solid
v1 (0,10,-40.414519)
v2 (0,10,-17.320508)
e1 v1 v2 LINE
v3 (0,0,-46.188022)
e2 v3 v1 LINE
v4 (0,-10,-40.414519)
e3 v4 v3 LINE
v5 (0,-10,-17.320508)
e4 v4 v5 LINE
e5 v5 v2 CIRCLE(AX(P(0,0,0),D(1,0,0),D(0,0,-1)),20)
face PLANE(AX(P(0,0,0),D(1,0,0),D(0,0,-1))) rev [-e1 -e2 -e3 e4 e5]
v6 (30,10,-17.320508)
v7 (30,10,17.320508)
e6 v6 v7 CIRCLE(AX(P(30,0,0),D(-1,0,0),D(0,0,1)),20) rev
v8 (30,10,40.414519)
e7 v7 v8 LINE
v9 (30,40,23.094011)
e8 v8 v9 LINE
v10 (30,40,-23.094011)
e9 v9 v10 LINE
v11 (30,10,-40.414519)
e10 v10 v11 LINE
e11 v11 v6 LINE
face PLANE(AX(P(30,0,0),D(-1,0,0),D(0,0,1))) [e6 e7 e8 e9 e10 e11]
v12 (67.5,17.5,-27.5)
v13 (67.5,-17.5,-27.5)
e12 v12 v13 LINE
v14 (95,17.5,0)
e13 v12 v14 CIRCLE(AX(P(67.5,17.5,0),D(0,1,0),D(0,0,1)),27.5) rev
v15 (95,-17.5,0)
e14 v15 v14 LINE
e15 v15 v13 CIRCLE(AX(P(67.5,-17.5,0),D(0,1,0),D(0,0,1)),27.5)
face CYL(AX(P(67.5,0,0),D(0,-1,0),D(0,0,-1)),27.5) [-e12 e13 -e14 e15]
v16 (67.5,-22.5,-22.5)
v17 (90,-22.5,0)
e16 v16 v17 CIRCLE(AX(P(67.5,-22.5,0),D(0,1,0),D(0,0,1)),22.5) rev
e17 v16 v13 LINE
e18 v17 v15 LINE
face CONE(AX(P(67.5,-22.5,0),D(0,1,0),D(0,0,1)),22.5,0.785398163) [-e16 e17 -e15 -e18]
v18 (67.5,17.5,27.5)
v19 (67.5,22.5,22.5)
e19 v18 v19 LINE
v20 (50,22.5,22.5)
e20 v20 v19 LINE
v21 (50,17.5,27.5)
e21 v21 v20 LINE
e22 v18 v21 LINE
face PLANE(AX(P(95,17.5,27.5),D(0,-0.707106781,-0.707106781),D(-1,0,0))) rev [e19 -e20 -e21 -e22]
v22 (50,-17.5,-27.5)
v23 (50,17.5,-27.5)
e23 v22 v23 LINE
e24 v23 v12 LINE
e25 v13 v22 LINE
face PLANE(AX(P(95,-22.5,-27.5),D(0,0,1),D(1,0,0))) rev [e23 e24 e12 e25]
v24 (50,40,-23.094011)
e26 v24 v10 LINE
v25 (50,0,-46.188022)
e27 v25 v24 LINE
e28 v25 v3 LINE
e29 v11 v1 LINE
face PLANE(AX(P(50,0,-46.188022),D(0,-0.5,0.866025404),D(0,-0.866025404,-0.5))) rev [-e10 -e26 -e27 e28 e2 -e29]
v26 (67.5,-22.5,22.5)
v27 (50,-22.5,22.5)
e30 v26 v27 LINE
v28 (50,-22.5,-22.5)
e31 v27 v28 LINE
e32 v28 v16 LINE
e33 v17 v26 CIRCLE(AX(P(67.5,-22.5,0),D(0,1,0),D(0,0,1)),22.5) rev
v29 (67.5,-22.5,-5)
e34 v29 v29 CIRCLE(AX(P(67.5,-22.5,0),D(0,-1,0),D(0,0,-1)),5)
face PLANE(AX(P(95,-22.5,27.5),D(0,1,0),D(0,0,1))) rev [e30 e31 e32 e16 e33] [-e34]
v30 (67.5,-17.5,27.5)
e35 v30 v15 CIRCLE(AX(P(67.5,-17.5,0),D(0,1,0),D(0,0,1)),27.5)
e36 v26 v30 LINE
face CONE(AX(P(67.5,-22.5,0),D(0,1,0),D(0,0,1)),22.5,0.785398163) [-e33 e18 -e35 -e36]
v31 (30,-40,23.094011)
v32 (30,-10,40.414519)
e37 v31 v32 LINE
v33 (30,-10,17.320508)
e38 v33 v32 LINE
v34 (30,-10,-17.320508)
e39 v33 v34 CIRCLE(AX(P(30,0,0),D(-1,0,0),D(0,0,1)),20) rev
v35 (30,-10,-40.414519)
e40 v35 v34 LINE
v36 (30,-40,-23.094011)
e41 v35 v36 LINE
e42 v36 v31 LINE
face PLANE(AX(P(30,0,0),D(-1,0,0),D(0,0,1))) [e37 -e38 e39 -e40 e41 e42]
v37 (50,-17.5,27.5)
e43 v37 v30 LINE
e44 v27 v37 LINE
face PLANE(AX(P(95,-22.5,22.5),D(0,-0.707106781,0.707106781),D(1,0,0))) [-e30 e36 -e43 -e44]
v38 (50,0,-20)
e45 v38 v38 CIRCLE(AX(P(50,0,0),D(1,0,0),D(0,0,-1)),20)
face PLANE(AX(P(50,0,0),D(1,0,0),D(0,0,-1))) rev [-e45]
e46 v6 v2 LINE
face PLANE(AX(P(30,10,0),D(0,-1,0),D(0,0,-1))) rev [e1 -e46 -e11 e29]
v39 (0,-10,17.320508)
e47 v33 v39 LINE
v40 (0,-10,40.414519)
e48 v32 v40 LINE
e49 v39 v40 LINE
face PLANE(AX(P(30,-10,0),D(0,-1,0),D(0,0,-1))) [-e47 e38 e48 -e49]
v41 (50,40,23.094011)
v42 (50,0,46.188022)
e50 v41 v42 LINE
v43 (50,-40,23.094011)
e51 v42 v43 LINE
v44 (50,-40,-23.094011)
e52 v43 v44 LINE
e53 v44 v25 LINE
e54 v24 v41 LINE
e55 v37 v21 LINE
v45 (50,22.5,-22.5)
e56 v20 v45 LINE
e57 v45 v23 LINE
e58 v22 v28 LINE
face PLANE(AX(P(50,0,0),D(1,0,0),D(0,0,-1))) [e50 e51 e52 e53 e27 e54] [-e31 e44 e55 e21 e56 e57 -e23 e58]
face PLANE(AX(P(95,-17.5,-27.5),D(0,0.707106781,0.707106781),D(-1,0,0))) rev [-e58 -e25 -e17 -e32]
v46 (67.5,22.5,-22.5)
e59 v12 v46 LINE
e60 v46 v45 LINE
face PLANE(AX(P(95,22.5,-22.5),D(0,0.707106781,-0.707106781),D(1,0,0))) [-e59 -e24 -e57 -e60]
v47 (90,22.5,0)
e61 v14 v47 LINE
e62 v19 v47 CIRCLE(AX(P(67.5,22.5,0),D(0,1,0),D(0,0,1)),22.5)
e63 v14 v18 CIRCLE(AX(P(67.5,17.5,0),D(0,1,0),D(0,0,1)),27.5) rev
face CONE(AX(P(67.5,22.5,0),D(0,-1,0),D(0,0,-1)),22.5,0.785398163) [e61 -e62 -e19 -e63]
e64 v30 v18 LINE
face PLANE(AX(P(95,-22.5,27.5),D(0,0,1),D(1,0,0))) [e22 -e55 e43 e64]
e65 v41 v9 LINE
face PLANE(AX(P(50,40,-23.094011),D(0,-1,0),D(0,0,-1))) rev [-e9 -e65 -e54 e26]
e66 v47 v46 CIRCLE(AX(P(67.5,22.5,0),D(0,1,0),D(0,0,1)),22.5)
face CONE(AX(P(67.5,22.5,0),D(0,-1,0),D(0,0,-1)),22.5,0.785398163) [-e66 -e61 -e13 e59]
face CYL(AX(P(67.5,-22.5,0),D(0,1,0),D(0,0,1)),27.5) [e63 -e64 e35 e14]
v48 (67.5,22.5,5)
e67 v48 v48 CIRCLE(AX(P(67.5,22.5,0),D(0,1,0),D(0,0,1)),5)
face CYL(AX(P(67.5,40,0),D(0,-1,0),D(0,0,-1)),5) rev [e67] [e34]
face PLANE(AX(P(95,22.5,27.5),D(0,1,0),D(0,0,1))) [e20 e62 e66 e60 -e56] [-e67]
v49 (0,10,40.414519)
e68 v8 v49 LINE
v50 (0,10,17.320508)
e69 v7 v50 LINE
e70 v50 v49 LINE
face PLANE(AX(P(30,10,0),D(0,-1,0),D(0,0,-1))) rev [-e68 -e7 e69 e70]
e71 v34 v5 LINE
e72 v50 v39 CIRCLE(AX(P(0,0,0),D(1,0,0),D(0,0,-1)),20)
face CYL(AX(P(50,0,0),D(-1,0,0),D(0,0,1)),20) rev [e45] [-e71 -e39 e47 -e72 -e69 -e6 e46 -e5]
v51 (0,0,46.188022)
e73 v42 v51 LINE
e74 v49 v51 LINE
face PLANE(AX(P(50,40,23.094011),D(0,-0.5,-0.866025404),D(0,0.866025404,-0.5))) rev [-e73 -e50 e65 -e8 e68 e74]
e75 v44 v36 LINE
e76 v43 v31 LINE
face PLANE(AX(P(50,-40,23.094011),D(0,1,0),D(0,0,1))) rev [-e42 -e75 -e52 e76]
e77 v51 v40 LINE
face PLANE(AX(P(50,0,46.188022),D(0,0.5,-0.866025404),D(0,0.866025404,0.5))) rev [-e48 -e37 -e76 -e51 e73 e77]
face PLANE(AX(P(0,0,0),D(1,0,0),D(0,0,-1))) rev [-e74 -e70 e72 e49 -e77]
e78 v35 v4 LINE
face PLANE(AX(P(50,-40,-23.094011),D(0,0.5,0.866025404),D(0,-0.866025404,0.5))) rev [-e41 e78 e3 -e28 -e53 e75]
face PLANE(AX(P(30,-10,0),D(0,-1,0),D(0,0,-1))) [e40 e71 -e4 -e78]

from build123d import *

# Parameters (mm, degrees)
SKETCH_2_R          = 20
EXTRUDE_1_DEPTH     = 50
CUT_EXTRUDE_2_DEPTH = 30
CUT_EXTRUDE_3_DEPTH = 30
SKETCH_5_W          = 55
SKETCH_5_H          = 45
EXTRUDE_2_DEPTH     = 45
FILLET_2_R          = 27.5
FILLET_3_R          = 27.5
CHAMFER_1_SIZE      = 5
SKETCH_6_R          = 5
CUT_EXTRUDE_4_DEPTH = 123.737864302
CHAMFER_2_SIZE      = 5


with BuildPart() as part:
    # 스케치2 → 보스-돌출1 (new body)
    with BuildSketch(Plane(origin=(0, 0, 0), x_dir=(0, 0, -1), z_dir=(1, 0, 0))):
        Polygon((46.188021535, 0), (23.094010768, 40), (-23.094010768, 40), (-46.188021535, 0), (-23.094010768, -40), (23.094010768, -40), align=None)
        Circle(SKETCH_2_R, mode=Mode.SUBTRACT)
    extrude(amount=EXTRUDE_1_DEPTH)

    # 스케치3 → 컷-돌출2 (cut)
    with BuildSketch(Plane.ZY):
        with BuildLine():
            ThreePointArc((-17.320508076, 10), (0, 20), (17.320508076, 10))
            Line((17.320508076, 10), (40.414518843, 10))
            Line((40.414518843, 10), (23.094010768, 40))
            Line((23.094010768, 40), (-23.094010768, 40))
            Line((-23.094010768, 40), (-40.414518843, 10))
            Line((-40.414518843, 10), (-17.320508076, 10))
        make_face()
    extrude(amount=-CUT_EXTRUDE_2_DEPTH, mode=Mode.SUBTRACT)

    # 스케치3<4> → 컷-돌출3 (cut)
    with BuildSketch(Plane.ZY):
        with BuildLine():
            Line((40.414518843, -10), (17.320508076, -10))
            ThreePointArc((17.320508076, -10), (0, -20), (-17.320508076, -10))
            Line((-17.320508076, -10), (-40.414518843, -10))
            Line((-40.414518843, -10), (-23.094010768, -40))
            Line((-23.094010768, -40), (23.094010768, -40))
            Line((23.094010768, -40), (40.414518843, -10))
        make_face()
    extrude(amount=-CUT_EXTRUDE_3_DEPTH, mode=Mode.SUBTRACT)

    # 스케치5 → 보스-돌출2 (add)
    with BuildSketch(Plane(origin=(50, 0, 0), x_dir=(0, 0, -1), z_dir=(1, 0, 0))):
        Rectangle(SKETCH_5_W, SKETCH_5_H)
    extrude(amount=EXTRUDE_2_DEPTH)

    # 필렛2
    fillet_2_edges = [part.edges().sort_by_distance(p)[0] for p in [
        (95, 0, -27.5),
    ]]
    fillet(fillet_2_edges, radius=FILLET_2_R)

    # 필렛3
    fillet_3_edges = [part.edges().sort_by_distance(p)[0] for p in [
        (95, 0, 27.5),
    ]]
    fillet(fillet_3_edges, radius=FILLET_3_R - 0.0001)  # a hair under: the kernel refuses the full size

    # 모따기1
    chamfer_1_edges = [part.edges().sort_by_distance(p)[0] for p in [
        (58.75, -22.5, -27.5),
        (86.945436483, -22.5, -19.445436483),
        (58.75005, -22.5, 27.5),
        (86.945465772, -22.5, 19.445465772),
    ]]
    chamfer(chamfer_1_edges, length=CHAMFER_1_SIZE)

    # 스케치6 → 컷-돌출4 (cut, through all)
    with BuildSketch(Plane.XZ.offset(22.5)):
        with Locations(Location((67.5, 0, 0), (0, 0, 270))):
            Circle(SKETCH_6_R)
    extrude(amount=-CUT_EXTRUDE_4_DEPTH, mode=Mode.SUBTRACT)

    # 모따기2
    chamfer_2_edges = [part.edges().sort_by_distance(p)[0] for p in [
        (58.75, 22.5, -27.5),
        (86.945436483, 22.5, -19.445436483),
        (58.75005, 22.5, 27.5),
        (86.945465772, 22.5, 19.445465772),
    ]]
    chamfer(chamfer_2_edges, length=CHAMFER_2_SIZE)


solid = part.part
